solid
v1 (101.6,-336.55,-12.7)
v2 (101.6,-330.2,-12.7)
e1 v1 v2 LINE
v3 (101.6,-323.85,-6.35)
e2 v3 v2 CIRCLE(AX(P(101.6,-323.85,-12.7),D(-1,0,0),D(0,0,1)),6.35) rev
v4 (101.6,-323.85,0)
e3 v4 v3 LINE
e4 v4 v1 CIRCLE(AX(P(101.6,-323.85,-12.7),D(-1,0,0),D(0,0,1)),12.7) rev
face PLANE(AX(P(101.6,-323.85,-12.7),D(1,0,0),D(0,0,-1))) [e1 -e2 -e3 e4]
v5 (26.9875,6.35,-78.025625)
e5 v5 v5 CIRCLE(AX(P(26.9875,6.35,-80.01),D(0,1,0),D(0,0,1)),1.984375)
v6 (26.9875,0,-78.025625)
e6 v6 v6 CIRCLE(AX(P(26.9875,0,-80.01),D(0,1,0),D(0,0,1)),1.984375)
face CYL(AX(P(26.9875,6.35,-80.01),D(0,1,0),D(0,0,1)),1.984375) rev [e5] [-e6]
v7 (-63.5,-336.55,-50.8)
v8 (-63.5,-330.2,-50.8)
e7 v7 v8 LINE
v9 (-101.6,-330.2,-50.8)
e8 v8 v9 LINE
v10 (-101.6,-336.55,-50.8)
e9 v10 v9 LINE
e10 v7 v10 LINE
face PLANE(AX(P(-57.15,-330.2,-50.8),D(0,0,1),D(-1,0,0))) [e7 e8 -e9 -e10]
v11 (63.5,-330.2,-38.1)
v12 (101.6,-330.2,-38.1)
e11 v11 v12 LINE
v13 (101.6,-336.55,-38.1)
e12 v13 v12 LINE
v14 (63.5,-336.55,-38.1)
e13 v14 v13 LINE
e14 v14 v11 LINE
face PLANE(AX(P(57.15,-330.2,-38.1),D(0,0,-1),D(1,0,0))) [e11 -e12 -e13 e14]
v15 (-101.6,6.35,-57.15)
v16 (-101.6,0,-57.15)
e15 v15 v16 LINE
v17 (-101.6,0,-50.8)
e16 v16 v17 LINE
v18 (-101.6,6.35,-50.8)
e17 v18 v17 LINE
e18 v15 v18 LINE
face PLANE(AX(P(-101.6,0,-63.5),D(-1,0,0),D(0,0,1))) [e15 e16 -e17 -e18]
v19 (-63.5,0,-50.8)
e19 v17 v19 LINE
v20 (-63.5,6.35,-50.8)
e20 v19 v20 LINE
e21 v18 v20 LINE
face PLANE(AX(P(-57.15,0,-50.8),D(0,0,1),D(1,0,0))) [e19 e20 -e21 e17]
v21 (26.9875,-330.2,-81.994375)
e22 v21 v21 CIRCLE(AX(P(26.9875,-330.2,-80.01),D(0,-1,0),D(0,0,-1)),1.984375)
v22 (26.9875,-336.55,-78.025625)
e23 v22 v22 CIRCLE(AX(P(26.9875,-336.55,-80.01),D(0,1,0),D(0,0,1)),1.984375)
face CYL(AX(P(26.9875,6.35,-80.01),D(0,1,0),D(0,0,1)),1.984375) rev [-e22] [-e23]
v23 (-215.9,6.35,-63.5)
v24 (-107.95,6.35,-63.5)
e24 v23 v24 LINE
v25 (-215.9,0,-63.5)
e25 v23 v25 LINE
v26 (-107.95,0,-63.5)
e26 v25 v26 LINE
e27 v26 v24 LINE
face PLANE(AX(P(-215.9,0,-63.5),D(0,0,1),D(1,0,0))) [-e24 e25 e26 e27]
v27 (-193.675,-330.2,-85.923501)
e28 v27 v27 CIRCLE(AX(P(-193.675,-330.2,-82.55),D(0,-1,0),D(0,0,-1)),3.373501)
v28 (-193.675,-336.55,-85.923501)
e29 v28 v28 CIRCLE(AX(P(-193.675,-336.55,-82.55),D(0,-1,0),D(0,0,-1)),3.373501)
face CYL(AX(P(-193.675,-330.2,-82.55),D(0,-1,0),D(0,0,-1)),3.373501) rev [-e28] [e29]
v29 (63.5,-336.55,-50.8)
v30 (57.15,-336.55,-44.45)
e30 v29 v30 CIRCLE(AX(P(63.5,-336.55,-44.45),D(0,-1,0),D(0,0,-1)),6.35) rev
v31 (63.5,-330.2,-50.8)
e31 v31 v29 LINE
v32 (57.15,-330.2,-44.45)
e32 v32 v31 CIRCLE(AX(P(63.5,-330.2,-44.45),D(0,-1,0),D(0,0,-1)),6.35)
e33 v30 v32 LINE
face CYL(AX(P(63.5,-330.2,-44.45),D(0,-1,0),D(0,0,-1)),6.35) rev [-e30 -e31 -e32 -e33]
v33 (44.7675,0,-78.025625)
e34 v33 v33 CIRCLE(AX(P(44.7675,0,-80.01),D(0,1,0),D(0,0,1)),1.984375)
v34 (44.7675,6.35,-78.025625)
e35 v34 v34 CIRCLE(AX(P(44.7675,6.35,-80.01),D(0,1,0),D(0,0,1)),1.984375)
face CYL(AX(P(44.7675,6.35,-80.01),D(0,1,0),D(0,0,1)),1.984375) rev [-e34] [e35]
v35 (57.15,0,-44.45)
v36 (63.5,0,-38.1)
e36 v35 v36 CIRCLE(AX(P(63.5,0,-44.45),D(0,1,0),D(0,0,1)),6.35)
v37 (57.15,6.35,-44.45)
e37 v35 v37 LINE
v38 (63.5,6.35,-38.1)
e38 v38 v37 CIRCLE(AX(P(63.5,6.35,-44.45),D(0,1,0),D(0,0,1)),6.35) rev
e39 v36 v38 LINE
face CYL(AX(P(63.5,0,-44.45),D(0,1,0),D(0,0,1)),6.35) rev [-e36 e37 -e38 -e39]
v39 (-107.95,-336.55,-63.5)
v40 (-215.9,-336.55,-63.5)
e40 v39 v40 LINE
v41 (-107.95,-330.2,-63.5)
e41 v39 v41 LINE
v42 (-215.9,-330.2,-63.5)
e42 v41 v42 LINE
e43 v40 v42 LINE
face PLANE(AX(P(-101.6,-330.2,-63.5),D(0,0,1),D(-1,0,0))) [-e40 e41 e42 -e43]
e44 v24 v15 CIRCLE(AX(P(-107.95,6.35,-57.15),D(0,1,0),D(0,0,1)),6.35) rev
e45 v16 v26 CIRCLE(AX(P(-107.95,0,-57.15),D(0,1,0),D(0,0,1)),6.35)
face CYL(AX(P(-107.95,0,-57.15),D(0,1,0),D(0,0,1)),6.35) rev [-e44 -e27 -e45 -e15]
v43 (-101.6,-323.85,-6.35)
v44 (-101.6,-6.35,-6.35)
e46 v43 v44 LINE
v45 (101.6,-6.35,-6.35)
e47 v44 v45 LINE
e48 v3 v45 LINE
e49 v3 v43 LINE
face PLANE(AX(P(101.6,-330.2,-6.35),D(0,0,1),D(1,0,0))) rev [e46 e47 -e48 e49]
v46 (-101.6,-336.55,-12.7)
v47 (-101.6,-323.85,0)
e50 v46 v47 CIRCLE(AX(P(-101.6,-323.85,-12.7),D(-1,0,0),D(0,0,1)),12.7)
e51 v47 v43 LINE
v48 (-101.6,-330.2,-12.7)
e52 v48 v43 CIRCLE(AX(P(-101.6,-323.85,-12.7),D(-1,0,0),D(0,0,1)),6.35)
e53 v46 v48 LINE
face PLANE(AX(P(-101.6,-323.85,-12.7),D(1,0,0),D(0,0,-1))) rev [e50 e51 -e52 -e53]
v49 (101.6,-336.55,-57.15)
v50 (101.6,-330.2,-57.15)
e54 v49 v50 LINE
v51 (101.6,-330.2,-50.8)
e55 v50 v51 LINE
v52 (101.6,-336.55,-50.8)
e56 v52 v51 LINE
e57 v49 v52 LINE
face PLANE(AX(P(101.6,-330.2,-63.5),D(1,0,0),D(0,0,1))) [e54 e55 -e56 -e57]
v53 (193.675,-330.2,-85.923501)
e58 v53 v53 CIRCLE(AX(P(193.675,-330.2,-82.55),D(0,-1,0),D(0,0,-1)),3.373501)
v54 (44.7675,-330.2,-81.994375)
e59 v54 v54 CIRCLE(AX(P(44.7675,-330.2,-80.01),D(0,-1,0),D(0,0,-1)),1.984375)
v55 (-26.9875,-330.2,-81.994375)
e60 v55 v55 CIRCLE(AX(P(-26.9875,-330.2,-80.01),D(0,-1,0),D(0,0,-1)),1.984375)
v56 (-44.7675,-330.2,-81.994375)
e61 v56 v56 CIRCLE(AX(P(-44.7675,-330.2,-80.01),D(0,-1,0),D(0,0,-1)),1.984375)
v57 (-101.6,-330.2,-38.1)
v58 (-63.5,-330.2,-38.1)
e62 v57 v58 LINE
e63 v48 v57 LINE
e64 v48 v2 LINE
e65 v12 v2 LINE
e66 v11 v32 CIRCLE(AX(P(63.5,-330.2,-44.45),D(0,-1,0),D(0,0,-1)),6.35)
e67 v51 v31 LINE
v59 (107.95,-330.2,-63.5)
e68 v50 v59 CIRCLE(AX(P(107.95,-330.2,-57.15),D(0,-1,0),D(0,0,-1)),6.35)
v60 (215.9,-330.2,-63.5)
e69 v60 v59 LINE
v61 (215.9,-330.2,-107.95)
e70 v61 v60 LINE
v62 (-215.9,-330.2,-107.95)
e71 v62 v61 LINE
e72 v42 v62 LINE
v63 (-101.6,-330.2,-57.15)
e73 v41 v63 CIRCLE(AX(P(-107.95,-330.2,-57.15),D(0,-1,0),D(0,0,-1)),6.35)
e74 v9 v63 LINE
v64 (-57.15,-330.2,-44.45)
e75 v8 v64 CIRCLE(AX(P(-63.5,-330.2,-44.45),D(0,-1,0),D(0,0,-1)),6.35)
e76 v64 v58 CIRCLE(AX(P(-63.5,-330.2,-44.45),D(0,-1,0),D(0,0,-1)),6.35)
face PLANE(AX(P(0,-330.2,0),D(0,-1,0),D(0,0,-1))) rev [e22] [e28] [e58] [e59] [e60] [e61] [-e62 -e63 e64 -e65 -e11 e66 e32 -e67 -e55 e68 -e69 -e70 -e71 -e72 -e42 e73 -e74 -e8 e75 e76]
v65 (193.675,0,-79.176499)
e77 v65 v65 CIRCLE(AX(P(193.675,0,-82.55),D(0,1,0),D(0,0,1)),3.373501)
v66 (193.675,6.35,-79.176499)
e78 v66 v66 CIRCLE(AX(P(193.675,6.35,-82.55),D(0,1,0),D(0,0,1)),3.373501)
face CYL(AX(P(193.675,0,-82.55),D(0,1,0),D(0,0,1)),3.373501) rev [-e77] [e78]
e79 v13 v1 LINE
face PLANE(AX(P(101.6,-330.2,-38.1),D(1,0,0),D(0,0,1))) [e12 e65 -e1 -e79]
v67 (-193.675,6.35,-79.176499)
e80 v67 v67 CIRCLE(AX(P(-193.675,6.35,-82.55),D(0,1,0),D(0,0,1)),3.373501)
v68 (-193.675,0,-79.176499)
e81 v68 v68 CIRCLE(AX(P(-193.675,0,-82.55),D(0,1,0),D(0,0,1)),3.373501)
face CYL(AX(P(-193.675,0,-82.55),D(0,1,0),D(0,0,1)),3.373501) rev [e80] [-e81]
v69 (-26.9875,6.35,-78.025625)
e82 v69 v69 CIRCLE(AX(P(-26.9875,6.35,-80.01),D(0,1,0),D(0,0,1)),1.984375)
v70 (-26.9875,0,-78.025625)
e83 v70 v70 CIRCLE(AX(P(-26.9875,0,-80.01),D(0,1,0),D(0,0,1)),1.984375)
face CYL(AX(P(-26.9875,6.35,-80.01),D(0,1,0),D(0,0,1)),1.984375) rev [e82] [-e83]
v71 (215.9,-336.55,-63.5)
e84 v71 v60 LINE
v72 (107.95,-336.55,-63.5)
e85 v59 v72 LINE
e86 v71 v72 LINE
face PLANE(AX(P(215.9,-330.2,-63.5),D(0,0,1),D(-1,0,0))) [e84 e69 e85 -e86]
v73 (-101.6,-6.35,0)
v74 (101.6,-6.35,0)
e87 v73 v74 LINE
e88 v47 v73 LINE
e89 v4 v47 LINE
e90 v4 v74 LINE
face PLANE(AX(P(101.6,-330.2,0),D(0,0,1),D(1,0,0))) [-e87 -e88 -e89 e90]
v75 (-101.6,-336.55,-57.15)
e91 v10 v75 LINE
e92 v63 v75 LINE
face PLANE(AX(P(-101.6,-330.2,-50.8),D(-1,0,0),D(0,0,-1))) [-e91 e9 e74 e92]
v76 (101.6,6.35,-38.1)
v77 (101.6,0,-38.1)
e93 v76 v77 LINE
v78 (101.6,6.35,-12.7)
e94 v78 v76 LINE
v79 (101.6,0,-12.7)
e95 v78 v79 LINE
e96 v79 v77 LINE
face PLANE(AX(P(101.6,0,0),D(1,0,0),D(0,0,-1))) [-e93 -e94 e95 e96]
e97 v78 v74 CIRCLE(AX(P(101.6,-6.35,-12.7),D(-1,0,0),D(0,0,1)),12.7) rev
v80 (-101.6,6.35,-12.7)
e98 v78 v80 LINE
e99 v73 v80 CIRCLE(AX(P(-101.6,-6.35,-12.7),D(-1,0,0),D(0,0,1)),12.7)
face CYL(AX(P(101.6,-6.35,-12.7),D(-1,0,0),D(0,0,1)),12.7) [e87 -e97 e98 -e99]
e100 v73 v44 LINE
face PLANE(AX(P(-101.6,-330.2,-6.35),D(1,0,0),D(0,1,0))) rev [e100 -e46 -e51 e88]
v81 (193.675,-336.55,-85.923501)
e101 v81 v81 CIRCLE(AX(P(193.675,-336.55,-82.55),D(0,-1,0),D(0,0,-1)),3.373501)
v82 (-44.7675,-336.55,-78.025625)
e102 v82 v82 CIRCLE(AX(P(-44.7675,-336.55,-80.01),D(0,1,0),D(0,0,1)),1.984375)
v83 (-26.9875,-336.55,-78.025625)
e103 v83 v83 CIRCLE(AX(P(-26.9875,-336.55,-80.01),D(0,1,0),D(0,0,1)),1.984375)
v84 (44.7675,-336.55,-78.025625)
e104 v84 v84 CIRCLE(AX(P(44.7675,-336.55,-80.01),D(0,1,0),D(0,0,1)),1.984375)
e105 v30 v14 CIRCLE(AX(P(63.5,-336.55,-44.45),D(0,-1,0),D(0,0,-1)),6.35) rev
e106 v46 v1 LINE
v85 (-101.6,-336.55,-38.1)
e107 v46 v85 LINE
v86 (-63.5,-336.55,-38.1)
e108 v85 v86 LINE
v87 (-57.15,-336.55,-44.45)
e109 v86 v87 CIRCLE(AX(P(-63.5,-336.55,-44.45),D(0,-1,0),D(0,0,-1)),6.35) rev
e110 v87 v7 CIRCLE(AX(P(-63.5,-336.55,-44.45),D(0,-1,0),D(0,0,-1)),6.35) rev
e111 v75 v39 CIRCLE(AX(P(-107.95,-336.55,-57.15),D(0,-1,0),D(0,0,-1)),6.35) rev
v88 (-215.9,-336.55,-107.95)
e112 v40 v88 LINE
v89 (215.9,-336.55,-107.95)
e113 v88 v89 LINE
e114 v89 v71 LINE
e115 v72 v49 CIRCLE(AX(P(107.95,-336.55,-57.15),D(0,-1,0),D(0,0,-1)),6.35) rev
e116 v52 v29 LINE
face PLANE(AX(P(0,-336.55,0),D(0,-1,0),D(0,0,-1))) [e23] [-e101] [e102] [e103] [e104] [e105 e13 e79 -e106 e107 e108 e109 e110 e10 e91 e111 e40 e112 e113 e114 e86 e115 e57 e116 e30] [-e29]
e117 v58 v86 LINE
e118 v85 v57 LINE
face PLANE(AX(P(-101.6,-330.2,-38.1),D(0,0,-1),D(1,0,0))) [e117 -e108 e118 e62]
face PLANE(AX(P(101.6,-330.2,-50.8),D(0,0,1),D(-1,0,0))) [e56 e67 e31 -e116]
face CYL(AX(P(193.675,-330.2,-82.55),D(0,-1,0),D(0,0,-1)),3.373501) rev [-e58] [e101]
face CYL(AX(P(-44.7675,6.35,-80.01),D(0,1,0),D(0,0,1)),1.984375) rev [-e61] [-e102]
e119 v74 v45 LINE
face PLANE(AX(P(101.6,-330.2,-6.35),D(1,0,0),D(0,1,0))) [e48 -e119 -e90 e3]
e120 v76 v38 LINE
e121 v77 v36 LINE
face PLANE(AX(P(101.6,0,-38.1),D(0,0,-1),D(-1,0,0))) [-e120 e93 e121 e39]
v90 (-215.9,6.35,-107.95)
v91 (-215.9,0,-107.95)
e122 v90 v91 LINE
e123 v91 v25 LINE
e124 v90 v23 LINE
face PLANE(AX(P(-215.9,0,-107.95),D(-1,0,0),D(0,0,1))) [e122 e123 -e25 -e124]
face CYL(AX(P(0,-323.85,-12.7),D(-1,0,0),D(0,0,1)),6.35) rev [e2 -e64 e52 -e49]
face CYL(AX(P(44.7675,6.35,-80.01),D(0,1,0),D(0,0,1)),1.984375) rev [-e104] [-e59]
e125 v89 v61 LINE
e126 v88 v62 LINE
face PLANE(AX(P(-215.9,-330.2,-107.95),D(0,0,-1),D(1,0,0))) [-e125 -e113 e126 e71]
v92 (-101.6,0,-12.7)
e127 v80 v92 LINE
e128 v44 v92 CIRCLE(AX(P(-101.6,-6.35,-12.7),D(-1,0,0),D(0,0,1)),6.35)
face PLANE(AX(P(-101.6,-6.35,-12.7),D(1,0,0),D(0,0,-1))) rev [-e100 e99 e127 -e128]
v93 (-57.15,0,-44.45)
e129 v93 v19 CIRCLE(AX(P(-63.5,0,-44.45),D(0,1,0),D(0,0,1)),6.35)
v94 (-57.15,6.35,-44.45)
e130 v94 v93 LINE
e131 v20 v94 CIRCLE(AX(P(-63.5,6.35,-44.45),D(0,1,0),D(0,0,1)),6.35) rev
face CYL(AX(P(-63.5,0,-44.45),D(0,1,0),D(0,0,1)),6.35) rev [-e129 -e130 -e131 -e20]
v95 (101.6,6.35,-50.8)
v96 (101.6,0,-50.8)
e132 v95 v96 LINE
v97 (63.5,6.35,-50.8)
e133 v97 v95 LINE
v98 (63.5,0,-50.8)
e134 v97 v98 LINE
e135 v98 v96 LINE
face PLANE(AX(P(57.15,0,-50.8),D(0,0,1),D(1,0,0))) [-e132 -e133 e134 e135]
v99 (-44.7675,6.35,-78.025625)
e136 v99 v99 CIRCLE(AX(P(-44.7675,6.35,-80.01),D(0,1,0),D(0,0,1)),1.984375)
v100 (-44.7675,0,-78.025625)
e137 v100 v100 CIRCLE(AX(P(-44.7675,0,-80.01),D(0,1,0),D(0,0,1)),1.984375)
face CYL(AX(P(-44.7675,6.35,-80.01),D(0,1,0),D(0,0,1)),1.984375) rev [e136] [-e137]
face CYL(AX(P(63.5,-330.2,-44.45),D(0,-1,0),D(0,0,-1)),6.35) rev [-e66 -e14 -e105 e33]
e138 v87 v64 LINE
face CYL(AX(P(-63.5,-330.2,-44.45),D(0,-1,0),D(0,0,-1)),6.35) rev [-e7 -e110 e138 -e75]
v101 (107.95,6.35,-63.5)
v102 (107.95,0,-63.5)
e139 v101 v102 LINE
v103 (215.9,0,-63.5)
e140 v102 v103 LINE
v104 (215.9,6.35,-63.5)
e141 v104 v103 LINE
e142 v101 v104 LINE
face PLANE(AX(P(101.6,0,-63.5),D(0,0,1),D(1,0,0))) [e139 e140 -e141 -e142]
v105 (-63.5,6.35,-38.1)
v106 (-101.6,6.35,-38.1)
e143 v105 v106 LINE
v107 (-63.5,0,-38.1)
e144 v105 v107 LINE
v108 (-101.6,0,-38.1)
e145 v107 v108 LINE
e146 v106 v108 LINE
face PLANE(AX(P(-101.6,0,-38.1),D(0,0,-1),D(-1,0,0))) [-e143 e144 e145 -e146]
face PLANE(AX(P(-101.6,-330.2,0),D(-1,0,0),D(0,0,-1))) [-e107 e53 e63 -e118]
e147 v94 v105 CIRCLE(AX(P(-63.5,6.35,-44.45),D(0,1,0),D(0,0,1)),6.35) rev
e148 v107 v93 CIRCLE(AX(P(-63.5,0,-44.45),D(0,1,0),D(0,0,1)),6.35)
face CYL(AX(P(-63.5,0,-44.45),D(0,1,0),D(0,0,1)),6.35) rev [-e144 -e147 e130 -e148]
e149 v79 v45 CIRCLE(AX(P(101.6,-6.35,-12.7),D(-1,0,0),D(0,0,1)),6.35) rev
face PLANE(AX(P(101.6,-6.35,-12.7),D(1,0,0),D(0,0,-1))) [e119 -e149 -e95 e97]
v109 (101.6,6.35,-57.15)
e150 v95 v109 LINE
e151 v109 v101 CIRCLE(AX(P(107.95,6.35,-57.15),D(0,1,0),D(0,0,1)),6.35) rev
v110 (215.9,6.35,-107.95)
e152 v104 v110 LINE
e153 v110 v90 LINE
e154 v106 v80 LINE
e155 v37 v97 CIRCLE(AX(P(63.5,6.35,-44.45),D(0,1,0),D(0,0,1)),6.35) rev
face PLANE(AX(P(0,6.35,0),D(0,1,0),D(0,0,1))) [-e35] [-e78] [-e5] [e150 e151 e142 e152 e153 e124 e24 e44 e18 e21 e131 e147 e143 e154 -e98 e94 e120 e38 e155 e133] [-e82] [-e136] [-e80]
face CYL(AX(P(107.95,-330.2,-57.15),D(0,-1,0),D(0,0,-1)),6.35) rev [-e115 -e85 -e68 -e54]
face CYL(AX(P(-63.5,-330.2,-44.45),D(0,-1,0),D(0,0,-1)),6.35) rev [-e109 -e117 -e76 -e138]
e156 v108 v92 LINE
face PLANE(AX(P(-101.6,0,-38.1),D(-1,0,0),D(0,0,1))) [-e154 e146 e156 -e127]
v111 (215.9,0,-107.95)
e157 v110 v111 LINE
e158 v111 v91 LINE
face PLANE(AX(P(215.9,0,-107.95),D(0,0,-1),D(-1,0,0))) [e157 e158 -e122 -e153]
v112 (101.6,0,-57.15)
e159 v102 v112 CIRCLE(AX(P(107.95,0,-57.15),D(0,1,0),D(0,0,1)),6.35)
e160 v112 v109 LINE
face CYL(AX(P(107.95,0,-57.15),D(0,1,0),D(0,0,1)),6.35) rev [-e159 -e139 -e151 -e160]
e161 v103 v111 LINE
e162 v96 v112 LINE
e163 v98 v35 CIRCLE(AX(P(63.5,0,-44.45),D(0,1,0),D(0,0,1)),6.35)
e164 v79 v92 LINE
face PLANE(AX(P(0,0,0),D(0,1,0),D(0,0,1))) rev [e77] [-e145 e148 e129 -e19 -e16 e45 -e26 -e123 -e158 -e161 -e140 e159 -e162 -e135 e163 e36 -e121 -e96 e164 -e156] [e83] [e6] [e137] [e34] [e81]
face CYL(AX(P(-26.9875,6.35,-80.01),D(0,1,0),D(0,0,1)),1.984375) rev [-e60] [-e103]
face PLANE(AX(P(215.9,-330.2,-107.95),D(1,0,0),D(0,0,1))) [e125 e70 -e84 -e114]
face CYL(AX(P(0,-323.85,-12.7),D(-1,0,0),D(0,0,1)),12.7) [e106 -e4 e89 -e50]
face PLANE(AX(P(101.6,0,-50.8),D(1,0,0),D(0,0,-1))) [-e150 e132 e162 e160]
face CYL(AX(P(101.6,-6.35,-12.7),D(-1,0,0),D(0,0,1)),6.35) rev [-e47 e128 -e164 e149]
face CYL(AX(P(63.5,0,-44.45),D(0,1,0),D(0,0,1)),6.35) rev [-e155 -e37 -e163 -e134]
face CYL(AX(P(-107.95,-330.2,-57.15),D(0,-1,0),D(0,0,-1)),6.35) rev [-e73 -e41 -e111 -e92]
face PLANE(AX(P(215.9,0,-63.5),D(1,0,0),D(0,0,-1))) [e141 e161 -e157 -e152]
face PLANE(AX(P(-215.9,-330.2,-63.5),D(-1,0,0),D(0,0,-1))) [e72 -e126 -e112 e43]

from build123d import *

# Parameters (mm, degrees)
BOSS_EXTRUDE1_DEPTH              = 6.35
SKETCH2_W                        = 203.2
SKETCH2_H                        = 6.35
BOSS_EXTRUDE2_DEPTH              = 330.2
BOSS_EXTRUDE3_DEPTH              = 6.35
F_17_64_0_26563_DIAMETER_HOLE1_D = 6.747002
CONVERT_SOLID1_START             = -101.6
CONVERT_SOLID1_DEPTH             = 203.2
CONVERT_SOLID1_2_DEPTH           = 203.2
F_5_32_0_15625_DIAMETER_HOLE1_D  = 3.96875
FILLET1_R                        = 6.35
FILLET2_R                        = 6.35


# Read off the part's stored shape, not the designer's step: Convert-Solid1
with BuildPart() as part:
    # Sketch1 → Boss-Extrude1 (new body)
    with BuildSketch(Plane(origin=(0, 0, 0), x_dir=(1, 0, 0), z_dir=(0, 1, 0))):
        Polygon((-215.9, 107.95), (-215.9, 63.5), (-101.6, 63.5), (-101.6, 50.8), (-57.15, 50.8), (-57.15, 38.1), (-101.6, 38.1), (-101.6, 0), (101.6, 0), (101.6, 38.1), (57.15, 38.1), (57.15, 50.8), (101.6, 50.8), (101.6, 63.5), (215.9, 63.5), (215.9, 107.95), align=None)
    extrude(amount=BOSS_EXTRUDE1_DEPTH)

    # Sketch2 → Boss-Extrude2 (add)
    with BuildSketch(Plane.XZ):
        with Locations((0, -3.175)):
            Rectangle(SKETCH2_W, SKETCH2_H)
    extrude(amount=BOSS_EXTRUDE2_DEPTH)

    # Sketch3 → Boss-Extrude3 (add)
    with BuildSketch(Plane.XZ.offset(330.2)):
        Polygon((-215.9, -107.95), (215.9, -107.95), (215.9, -63.5), (101.6, -63.5), (101.6, -50.8), (57.15, -50.8), (57.15, -38.1), (101.6, -38.1), (101.6, 0), (-101.6, 0), (-101.6, -38.1), (-57.15, -38.1), (-57.15, -50.8), (-101.6, -50.8), (-101.6, -63.5), (-215.9, -63.5), align=None)
    extrude(amount=BOSS_EXTRUDE3_DEPTH)

    # 17/64 (0.26563) Diameter Hole1 (through all)
    with Locations(Plane(origin=(0, 6.35, 0), x_dir=(1, 0, 0), z_dir=(0, 1, 0))):
        with Locations((-193.675, 82.55), (193.675, 82.55)):
            Hole(F_17_64_0_26563_DIAMETER_HOLE1_D / 2)

    # Convert-Solid1 outline → Convert-Solid1 (cut)
    with BuildSketch(Plane.YZ.offset(CONVERT_SOLID1_START)):
        with BuildLine():
            Line((6.35, 0), (-6.35, 0))
            ThreePointArc((-6.35, 0), (2.630256121, -3.719743879), (6.35, -12.7))
            Line((6.35, -12.7), (6.35, 0))
        make_face()
        with BuildLine():
            ThreePointArc((-336.55, -12.7), (-332.830256121, -3.719743879), (-323.85, 0))
            Line((-323.85, 0), (-336.55, 0))
            Line((-336.55, 0), (-336.55, -12.7))
        make_face()
    extrude(amount=CONVERT_SOLID1_DEPTH, mode=Mode.SUBTRACT)

    # Convert-Solid1 2 outline → Convert-Solid1 2 (add)
    with BuildSketch(Plane.YZ.offset(CONVERT_SOLID1_START)):
        with BuildLine():
            Line((0, -6.35), (-6.35, -6.35))
            ThreePointArc((-6.35, -6.35), (-1.859871939, -8.209871939), (0, -12.7))
            Line((0, -12.7), (0, -6.35))
        make_face()
        with BuildLine():
            ThreePointArc((-330.2, -12.7), (-328.340128061, -8.209871939), (-323.85, -6.35))
            Line((-323.85, -6.35), (-330.2, -6.35))
            Line((-330.2, -6.35), (-330.2, -12.7))
        make_face()
    extrude(amount=CONVERT_SOLID1_2_DEPTH)

    # 5/32 (0.15625) Diameter Hole1 (through all)
    with Locations(Plane(origin=(-44.7675, 6.35, -80.01), x_dir=(0, 0, 1), z_dir=(0, 1, 0))):
        with Locations((0, 0), (0, 17.78), (0, 71.755), (0, 89.535)):
            Hole(F_5_32_0_15625_DIAMETER_HOLE1_D / 2)

    # Fillet1
    fillet1_edges = [part.edges().sort_by_distance(p)[0] for p in [
        (57.15, -333.375, -38.1),
        (57.15, -333.375, -50.8),
        (57.15, 3.175, -38.1),
        (57.15, 3.175, -50.8),
        (-57.15, -333.375, -50.8),
        (-57.15, 3.175, -38.1),
        (-57.15, -333.375, -38.1),
        (-57.15, 3.175, -50.8),
    ]]
    fillet(fillet1_edges, radius=FILLET1_R - 0.0001)  # a hair under: the kernel refuses the full size

    # Fillet2
    fillet2_edges = [part.edges().sort_by_distance(p)[0] for p in [
        (101.6, 3.175, -63.5),
        (-101.6, 3.175, -63.5),
        (-101.6, -333.375, -63.5),
        (101.6, -333.375, -63.5),
    ]]
    fillet(fillet2_edges, radius=FILLET2_R)


solid = part.part
